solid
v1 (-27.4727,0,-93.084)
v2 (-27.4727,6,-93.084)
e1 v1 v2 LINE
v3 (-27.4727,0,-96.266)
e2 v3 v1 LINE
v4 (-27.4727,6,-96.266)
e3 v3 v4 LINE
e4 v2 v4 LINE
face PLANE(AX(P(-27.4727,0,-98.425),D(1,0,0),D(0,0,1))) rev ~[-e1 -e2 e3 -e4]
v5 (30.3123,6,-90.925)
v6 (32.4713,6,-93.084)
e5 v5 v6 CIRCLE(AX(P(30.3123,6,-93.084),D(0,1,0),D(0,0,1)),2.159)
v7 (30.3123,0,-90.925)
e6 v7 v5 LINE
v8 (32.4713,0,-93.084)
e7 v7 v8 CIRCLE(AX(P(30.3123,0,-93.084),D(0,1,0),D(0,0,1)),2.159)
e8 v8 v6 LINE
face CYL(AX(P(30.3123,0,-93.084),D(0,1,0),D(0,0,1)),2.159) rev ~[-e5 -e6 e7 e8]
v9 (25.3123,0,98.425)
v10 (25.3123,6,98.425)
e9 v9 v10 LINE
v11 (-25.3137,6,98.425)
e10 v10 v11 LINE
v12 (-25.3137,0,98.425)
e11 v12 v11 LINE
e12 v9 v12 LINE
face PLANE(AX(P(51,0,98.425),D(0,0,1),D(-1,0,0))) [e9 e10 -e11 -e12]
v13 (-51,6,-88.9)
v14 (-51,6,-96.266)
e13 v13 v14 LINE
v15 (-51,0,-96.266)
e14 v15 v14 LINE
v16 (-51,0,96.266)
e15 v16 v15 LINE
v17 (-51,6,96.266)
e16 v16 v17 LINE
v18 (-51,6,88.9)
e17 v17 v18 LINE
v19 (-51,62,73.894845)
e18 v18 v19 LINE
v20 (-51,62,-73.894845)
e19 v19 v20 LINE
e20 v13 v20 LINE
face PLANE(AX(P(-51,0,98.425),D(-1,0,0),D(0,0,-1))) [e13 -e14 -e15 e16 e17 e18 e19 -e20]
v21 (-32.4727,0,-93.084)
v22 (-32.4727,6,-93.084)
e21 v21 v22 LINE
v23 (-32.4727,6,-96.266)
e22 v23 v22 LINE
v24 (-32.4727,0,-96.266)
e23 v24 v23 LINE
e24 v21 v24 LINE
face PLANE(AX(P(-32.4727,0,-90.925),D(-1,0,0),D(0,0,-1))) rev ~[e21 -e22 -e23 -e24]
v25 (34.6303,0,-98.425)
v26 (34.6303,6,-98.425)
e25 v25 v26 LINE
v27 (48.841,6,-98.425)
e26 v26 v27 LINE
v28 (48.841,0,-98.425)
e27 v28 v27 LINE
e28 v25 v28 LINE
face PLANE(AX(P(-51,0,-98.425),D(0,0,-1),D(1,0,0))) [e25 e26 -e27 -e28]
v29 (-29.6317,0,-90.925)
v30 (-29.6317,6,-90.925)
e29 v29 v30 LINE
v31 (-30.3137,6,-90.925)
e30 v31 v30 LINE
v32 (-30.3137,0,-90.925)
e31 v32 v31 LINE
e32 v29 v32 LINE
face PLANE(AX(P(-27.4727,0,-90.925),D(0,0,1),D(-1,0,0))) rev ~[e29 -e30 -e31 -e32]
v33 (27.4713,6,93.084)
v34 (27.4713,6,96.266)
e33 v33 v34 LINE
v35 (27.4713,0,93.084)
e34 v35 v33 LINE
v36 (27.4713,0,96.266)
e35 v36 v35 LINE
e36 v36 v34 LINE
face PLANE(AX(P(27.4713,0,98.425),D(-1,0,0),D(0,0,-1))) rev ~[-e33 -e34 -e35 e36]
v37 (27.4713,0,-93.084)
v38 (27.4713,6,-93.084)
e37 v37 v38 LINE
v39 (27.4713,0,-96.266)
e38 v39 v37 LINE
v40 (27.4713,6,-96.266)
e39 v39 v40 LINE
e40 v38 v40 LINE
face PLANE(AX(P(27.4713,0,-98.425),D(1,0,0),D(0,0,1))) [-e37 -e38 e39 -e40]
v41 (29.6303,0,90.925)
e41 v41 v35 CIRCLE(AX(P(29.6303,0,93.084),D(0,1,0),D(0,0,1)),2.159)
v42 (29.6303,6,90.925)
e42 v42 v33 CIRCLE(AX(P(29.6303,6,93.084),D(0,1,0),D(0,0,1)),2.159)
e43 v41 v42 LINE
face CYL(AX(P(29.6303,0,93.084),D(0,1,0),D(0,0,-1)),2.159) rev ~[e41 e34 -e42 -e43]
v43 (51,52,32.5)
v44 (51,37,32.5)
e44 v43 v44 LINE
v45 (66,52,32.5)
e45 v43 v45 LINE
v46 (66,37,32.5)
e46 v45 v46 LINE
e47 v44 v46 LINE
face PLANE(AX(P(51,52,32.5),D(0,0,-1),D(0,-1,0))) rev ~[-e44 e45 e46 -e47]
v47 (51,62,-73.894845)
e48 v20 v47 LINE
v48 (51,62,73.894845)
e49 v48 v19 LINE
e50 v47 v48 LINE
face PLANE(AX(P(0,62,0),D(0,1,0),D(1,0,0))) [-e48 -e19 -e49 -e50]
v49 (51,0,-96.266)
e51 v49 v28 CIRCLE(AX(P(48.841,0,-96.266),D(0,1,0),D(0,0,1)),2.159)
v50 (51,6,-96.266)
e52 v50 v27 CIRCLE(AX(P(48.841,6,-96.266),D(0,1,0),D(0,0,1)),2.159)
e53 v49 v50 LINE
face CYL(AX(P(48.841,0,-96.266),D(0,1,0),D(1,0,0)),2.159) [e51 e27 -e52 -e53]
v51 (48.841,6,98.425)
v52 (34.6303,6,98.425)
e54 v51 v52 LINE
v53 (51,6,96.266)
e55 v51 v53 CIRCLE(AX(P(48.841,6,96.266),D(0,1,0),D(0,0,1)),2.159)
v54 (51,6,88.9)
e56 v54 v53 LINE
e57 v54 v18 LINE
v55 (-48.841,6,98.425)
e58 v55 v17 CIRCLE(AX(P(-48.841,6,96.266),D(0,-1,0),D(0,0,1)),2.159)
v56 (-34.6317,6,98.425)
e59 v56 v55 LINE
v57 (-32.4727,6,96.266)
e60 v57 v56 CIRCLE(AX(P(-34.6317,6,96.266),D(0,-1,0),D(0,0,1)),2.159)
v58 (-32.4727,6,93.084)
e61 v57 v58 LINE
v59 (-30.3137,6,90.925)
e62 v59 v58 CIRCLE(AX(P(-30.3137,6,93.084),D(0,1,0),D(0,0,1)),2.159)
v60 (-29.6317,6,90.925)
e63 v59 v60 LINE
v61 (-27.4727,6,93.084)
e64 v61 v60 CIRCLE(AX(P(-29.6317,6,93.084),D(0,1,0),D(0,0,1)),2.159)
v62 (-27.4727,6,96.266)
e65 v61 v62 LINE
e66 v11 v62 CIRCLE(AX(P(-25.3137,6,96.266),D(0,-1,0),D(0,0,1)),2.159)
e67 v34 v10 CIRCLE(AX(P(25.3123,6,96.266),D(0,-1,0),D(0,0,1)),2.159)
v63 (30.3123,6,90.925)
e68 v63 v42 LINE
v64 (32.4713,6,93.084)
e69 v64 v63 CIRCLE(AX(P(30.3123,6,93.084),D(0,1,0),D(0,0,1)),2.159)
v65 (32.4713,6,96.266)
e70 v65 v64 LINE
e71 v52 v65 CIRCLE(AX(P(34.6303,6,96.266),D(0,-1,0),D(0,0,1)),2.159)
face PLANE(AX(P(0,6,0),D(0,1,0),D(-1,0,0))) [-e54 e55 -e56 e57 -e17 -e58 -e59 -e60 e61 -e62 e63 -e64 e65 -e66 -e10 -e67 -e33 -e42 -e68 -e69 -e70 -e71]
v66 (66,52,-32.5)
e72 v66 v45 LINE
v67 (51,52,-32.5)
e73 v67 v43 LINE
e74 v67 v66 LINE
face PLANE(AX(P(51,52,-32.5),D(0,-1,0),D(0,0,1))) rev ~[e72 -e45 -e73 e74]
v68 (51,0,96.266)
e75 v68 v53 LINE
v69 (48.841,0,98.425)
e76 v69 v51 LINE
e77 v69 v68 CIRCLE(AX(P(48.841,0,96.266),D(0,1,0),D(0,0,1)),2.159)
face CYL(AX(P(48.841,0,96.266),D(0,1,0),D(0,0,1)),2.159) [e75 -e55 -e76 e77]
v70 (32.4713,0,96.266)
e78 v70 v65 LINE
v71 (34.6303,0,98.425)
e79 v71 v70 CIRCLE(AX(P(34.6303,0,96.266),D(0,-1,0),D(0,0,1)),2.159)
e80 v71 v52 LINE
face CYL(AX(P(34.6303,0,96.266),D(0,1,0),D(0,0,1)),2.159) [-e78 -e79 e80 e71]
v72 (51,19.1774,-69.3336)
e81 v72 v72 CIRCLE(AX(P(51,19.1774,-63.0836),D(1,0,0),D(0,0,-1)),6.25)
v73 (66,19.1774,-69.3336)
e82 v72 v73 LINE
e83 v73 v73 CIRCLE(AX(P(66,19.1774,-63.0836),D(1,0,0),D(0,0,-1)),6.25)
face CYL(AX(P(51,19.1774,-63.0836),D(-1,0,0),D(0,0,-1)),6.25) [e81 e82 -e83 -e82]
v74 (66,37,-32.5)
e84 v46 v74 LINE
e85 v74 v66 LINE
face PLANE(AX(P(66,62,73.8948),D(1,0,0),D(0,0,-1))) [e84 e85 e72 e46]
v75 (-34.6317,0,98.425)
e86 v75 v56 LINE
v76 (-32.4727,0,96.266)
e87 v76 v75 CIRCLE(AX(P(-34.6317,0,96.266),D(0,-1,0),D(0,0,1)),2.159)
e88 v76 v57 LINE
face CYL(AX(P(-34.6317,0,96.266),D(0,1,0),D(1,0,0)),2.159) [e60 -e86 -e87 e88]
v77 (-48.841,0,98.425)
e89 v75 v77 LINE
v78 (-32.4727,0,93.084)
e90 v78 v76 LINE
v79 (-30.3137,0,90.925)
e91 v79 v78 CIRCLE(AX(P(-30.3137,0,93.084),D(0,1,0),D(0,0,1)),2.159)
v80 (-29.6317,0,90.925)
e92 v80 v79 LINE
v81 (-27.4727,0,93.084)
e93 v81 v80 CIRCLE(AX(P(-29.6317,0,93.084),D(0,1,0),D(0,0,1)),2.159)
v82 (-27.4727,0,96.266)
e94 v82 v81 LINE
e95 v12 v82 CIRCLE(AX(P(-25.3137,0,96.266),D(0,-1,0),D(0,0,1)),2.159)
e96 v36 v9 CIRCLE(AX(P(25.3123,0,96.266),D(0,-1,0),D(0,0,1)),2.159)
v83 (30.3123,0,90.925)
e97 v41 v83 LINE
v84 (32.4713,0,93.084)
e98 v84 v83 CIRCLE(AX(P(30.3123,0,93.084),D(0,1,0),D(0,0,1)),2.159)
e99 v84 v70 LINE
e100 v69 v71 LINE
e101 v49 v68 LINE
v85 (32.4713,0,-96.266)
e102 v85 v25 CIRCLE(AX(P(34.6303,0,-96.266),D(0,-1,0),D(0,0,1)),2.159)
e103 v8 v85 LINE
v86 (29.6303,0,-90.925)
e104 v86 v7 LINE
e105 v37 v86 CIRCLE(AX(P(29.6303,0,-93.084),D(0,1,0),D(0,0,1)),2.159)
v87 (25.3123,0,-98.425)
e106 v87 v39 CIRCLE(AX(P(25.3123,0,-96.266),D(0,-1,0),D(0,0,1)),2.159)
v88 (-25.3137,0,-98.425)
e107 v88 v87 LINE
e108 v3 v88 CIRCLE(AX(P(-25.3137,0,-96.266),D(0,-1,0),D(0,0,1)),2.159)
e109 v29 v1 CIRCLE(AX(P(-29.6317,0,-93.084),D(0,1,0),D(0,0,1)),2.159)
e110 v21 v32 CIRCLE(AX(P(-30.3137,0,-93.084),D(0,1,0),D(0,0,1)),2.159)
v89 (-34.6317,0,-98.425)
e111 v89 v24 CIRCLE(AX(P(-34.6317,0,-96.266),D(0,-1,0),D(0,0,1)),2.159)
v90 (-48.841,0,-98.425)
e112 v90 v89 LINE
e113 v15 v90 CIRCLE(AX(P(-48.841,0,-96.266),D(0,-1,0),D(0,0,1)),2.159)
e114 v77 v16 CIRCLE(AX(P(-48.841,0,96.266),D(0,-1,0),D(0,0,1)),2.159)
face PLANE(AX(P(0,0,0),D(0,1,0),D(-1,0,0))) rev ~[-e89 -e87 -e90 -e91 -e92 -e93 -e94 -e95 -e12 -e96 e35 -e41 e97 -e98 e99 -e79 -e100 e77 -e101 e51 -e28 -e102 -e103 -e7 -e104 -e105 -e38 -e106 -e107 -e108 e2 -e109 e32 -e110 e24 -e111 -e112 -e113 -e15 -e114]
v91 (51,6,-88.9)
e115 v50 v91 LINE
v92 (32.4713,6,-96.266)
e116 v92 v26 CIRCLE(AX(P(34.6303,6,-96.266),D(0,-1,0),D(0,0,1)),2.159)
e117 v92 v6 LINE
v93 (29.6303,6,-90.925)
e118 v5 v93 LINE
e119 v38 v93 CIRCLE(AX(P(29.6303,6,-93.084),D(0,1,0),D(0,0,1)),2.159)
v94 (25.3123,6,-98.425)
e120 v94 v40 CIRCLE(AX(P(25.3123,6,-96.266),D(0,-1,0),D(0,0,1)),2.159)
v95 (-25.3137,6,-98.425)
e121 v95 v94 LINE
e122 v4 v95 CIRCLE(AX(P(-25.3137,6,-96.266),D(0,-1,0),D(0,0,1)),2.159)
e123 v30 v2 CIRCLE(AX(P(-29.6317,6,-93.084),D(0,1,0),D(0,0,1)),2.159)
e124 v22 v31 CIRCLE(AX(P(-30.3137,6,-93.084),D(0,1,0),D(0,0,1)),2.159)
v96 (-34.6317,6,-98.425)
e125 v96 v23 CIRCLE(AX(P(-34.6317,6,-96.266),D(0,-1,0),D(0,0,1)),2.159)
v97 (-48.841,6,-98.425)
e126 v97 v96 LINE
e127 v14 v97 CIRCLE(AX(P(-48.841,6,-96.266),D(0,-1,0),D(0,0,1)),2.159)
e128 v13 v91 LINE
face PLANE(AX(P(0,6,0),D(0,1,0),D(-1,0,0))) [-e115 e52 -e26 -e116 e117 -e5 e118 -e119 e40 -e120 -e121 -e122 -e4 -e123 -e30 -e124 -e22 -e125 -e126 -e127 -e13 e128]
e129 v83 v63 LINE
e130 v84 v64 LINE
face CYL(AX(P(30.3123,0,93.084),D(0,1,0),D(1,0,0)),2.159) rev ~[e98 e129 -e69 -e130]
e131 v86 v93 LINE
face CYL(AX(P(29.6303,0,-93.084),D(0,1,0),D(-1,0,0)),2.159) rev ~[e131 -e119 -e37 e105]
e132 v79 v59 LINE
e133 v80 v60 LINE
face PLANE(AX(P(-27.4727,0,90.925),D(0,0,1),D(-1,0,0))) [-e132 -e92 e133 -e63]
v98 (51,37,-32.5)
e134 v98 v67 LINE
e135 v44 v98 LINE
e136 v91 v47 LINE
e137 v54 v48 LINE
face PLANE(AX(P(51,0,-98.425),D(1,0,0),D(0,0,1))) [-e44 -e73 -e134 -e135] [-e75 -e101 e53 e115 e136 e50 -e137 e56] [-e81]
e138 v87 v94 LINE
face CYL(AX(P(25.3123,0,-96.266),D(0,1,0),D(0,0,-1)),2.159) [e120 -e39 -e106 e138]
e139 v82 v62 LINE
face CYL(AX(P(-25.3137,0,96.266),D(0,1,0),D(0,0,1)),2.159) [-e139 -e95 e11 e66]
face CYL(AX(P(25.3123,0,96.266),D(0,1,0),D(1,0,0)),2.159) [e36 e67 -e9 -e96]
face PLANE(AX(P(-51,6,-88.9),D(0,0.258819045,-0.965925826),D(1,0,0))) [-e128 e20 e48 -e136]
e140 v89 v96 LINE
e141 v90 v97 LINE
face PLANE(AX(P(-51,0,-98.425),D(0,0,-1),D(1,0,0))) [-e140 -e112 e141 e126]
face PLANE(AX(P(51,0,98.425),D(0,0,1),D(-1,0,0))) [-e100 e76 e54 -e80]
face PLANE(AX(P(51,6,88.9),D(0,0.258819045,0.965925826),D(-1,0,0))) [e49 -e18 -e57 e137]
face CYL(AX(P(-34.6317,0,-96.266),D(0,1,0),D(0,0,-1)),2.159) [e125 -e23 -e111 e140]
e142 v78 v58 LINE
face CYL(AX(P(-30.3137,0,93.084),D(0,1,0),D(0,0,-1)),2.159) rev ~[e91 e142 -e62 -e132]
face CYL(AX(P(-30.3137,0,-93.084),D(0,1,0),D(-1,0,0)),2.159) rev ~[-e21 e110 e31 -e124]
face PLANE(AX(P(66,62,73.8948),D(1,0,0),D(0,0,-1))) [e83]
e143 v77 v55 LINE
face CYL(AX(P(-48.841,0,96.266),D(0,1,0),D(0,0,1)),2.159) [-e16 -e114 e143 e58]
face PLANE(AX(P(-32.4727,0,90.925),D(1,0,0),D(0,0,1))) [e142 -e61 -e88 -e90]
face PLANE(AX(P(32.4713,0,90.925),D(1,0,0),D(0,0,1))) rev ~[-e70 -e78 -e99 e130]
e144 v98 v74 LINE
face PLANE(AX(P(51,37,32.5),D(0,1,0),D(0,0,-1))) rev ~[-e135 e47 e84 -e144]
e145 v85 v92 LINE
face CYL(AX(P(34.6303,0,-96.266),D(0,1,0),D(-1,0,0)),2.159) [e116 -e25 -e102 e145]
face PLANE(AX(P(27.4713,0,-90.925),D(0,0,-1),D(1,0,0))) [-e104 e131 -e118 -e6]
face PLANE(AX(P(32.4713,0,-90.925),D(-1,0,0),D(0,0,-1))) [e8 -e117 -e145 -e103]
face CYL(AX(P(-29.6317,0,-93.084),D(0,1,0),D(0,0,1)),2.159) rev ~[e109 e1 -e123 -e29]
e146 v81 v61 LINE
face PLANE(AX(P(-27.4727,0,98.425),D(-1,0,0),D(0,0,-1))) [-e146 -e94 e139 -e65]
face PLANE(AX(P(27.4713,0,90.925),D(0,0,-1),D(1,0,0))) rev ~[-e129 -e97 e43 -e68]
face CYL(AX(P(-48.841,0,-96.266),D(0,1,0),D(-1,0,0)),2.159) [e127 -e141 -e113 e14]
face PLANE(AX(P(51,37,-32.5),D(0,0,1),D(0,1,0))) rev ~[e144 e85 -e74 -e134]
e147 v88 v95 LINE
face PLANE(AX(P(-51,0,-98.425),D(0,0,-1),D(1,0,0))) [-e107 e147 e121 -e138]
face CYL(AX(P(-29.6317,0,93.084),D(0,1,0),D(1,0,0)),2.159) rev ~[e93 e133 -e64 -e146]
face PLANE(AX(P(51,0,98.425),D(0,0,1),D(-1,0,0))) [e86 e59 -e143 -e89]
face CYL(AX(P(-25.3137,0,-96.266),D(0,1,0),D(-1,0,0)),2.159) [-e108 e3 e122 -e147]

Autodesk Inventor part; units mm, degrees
ref_plane "YZ Plane" through (0, 0, 0) normal (1, 0, 0) x (0, 1, 0)
ref_plane "XZ Plane" through (0, 0, 0) normal (0, 1, 0) x (-1, 0, 0)
ref_plane "XY Plane" through (0, 0, 0) normal (0, 0, 1) x (1, 0, 0)
sketch "Sketch1" plane through (0, 0, 0) normal (0, 1, 0) x (-1, 0, 0)
  line L0 (-51, 98.425) -> (51, 98.425)
  line L1 (51, 98.425) -> (51, -98.425)
  line L2 (51, -98.425) -> (-51, -98.425)
  line L3 (-51, -98.425) -> (-51, 98.425)
  line L4 (-51, 98.425) -> (51, -98.425) construction
  line L5 (51, 98.425) -> (-51, -98.425) construction
  point P0 (0, 0)
  dimension "d0" = 102
  dimension "d1" = 196.85
extrude "Extrusion1" add sketch "Sketch1" along normal blind 6
sketch "Sketch2" plane through (0, 6, 0) normal (0, 1, 0) x (1, 0, 0)
  line L0 (51, -88.9) -> (-51, -88.9)
  line L1 (-51, -88.9) -> (-51, 88.9)
  line L2 (-51, 88.9) -> (51, 88.9)
  line L3 (51, 88.9) -> (51, -88.9)
  line L4 (51, -88.9) -> (-51, 88.9) construction
  line L5 (-51, -88.9) -> (51, 88.9) construction
  point P0 (0, 0)
  dimension "d4" = 102
  dimension "d5" = 177.8
extrude "Extrusion2" add sketch "Sketch2" along normal blind 56
draft "FaceDraft1" angle 15 pull direction (0, 1, 0) faces at (17, 24.6667, 88.9) fixed edges at (0, 6, 88.9)
draft "FaceDraft2" angle 15 pull direction (0, 1, 0) faces at (-17, 24.6667, -88.9) fixed edges at (0, 6, -88.9)
sketch "Sketch3" plane through (0, 0, 0) normal (0, -1, 0) x (1, 0, 0)
  line L0 (32.4713, 98.425) -> (27.4713, 98.425)
  line L1 (27.4713, 98.425) -> (27.4713, 90.925)
  line L2 (27.4713, 90.925) -> (32.4713, 90.925)
  line L3 (32.4713, 90.925) -> (32.4713, 98.425)
  line L4 (32.4713, 98.425) -> (27.4713, 90.925) construction
  line L5 (27.4713, 98.425) -> (32.4713, 90.925) construction
  line L6 (51, -98.425) -> (51, 98.425) projected
  line L7 (-51, 98.425) -> (51, 98.425) projected
  line L8 (-27.4727, 90.925) -> (-32.4727, 90.925)
  line L9 (-32.4727, 90.925) -> (-32.4727, 98.425)
  line L10 (-32.4727, 98.425) -> (-27.4727, 98.425)
  line L11 (-27.4727, 98.425) -> (-27.4727, 90.925)
  line L12 (-27.4727, 90.925) -> (-32.4727, 98.425) construction
  line L13 (-32.4727, 90.925) -> (-27.4727, 98.425) construction
  line L14 (-51, 98.425) -> (-51, -98.425) projected
  line L15 (51, 0) -> (-51, 0)
  line L16 (-51, -73.8948) -> (-51, 73.8948) projected
  line L17 (32.4713, -98.425) -> (27.4713, -98.425)
  line L18 (27.4713, -98.425) -> (27.4713, -90.925)
  line L19 (27.4713, -90.925) -> (32.4713, -90.925)
  line L20 (32.4713, -90.925) -> (32.4713, -98.425)
  line L21 (-27.4727, -90.925) -> (-32.4727, -90.925)
  line L22 (-32.4727, -90.925) -> (-32.4727, -98.425)
  line L23 (-32.4727, -98.425) -> (-27.4727, -98.425)
  line L24 (-27.4727, -98.425) -> (-27.4727, -90.925)
  point P0 (0, 0)
  point P1 (29.9713, 94.675)
  point P2 (-29.9727, 94.675)
  point P3 (29.9713, -94.675)
  dimension "d10" = 5
  dimension "d11" = 7.5
  dimension "d12" = 21.0287
  dimension "d13" = 7.5
  dimension "d14" = 5
  dimension "d16" = 59.944
  dimension "d17" = 0
extrude "Extrusion3" cut sketch "Sketch3" against normal blind 56 contours L3 L2 L1 L0 | L11 L8 L9 L7 | L17 L18 L19 L20 | L24 L23 L22 L21
fillet "Fillet1" radius 2.159 20 edges at (27.4713, 3, 90.925) (32.4713, 3, 90.925) (32.4713, 3, 98.425) (27.4713, 3, 98.425) (-27.4727, 3, 90.925) (-32.4727, 3, 90.925) (-32.4727, 3, 98.425) (-27.4727, 3, 98.425) (-27.4727, 3, -98.425) (-27.4727, 3, -90.925) (-32.4727, 3, -90.925) (-32.4727, 3, -98.425) (27.4713, 3, -90.925) (27.4713, 3, -98.425) (32.4713, 3, -90.925) (32.4713, 3, -98.425) (51, 3, -98.425) (-51, 3, -98.425) (-51, 3, 98.425) (51, 3, 98.425)
sketch "Sketch4" plane through (51, 62, 73.8948) normal (1, 0, 0) x (0, 0, -1)
  line L0 (41.3948, -25) -> (106.3948, -25)
  line L1 (106.3948, -25) -> (106.3948, -10)
  line L2 (106.3948, -10) -> (41.3948, -10)
  line L3 (41.3948, -10) -> (41.3948, -25)
  line L4 (41.3948, -25) -> (106.3948, -10) construction
  line L5 (106.3948, -25) -> (41.3948, -10) construction
  line L6 (0, 0) -> (147.7897, 0) projected
  circle A0 centre (136.9784, -42.8226) radius 6.25
  point P0 (73.8948, -62)
  point P1 (73.8948, -17.5)
  dimension "d21" = 65
  dimension "d22" = 15
  dimension "d23" = 17.5
  dimension "d24" = 12.5
extrude "Extrusion4" add sketch "Sketch4" along normal blind 15
equation "\"d13\" = d11"
equation "\"d14\" = d10"
properties part number "12v_dc_to_dc"
